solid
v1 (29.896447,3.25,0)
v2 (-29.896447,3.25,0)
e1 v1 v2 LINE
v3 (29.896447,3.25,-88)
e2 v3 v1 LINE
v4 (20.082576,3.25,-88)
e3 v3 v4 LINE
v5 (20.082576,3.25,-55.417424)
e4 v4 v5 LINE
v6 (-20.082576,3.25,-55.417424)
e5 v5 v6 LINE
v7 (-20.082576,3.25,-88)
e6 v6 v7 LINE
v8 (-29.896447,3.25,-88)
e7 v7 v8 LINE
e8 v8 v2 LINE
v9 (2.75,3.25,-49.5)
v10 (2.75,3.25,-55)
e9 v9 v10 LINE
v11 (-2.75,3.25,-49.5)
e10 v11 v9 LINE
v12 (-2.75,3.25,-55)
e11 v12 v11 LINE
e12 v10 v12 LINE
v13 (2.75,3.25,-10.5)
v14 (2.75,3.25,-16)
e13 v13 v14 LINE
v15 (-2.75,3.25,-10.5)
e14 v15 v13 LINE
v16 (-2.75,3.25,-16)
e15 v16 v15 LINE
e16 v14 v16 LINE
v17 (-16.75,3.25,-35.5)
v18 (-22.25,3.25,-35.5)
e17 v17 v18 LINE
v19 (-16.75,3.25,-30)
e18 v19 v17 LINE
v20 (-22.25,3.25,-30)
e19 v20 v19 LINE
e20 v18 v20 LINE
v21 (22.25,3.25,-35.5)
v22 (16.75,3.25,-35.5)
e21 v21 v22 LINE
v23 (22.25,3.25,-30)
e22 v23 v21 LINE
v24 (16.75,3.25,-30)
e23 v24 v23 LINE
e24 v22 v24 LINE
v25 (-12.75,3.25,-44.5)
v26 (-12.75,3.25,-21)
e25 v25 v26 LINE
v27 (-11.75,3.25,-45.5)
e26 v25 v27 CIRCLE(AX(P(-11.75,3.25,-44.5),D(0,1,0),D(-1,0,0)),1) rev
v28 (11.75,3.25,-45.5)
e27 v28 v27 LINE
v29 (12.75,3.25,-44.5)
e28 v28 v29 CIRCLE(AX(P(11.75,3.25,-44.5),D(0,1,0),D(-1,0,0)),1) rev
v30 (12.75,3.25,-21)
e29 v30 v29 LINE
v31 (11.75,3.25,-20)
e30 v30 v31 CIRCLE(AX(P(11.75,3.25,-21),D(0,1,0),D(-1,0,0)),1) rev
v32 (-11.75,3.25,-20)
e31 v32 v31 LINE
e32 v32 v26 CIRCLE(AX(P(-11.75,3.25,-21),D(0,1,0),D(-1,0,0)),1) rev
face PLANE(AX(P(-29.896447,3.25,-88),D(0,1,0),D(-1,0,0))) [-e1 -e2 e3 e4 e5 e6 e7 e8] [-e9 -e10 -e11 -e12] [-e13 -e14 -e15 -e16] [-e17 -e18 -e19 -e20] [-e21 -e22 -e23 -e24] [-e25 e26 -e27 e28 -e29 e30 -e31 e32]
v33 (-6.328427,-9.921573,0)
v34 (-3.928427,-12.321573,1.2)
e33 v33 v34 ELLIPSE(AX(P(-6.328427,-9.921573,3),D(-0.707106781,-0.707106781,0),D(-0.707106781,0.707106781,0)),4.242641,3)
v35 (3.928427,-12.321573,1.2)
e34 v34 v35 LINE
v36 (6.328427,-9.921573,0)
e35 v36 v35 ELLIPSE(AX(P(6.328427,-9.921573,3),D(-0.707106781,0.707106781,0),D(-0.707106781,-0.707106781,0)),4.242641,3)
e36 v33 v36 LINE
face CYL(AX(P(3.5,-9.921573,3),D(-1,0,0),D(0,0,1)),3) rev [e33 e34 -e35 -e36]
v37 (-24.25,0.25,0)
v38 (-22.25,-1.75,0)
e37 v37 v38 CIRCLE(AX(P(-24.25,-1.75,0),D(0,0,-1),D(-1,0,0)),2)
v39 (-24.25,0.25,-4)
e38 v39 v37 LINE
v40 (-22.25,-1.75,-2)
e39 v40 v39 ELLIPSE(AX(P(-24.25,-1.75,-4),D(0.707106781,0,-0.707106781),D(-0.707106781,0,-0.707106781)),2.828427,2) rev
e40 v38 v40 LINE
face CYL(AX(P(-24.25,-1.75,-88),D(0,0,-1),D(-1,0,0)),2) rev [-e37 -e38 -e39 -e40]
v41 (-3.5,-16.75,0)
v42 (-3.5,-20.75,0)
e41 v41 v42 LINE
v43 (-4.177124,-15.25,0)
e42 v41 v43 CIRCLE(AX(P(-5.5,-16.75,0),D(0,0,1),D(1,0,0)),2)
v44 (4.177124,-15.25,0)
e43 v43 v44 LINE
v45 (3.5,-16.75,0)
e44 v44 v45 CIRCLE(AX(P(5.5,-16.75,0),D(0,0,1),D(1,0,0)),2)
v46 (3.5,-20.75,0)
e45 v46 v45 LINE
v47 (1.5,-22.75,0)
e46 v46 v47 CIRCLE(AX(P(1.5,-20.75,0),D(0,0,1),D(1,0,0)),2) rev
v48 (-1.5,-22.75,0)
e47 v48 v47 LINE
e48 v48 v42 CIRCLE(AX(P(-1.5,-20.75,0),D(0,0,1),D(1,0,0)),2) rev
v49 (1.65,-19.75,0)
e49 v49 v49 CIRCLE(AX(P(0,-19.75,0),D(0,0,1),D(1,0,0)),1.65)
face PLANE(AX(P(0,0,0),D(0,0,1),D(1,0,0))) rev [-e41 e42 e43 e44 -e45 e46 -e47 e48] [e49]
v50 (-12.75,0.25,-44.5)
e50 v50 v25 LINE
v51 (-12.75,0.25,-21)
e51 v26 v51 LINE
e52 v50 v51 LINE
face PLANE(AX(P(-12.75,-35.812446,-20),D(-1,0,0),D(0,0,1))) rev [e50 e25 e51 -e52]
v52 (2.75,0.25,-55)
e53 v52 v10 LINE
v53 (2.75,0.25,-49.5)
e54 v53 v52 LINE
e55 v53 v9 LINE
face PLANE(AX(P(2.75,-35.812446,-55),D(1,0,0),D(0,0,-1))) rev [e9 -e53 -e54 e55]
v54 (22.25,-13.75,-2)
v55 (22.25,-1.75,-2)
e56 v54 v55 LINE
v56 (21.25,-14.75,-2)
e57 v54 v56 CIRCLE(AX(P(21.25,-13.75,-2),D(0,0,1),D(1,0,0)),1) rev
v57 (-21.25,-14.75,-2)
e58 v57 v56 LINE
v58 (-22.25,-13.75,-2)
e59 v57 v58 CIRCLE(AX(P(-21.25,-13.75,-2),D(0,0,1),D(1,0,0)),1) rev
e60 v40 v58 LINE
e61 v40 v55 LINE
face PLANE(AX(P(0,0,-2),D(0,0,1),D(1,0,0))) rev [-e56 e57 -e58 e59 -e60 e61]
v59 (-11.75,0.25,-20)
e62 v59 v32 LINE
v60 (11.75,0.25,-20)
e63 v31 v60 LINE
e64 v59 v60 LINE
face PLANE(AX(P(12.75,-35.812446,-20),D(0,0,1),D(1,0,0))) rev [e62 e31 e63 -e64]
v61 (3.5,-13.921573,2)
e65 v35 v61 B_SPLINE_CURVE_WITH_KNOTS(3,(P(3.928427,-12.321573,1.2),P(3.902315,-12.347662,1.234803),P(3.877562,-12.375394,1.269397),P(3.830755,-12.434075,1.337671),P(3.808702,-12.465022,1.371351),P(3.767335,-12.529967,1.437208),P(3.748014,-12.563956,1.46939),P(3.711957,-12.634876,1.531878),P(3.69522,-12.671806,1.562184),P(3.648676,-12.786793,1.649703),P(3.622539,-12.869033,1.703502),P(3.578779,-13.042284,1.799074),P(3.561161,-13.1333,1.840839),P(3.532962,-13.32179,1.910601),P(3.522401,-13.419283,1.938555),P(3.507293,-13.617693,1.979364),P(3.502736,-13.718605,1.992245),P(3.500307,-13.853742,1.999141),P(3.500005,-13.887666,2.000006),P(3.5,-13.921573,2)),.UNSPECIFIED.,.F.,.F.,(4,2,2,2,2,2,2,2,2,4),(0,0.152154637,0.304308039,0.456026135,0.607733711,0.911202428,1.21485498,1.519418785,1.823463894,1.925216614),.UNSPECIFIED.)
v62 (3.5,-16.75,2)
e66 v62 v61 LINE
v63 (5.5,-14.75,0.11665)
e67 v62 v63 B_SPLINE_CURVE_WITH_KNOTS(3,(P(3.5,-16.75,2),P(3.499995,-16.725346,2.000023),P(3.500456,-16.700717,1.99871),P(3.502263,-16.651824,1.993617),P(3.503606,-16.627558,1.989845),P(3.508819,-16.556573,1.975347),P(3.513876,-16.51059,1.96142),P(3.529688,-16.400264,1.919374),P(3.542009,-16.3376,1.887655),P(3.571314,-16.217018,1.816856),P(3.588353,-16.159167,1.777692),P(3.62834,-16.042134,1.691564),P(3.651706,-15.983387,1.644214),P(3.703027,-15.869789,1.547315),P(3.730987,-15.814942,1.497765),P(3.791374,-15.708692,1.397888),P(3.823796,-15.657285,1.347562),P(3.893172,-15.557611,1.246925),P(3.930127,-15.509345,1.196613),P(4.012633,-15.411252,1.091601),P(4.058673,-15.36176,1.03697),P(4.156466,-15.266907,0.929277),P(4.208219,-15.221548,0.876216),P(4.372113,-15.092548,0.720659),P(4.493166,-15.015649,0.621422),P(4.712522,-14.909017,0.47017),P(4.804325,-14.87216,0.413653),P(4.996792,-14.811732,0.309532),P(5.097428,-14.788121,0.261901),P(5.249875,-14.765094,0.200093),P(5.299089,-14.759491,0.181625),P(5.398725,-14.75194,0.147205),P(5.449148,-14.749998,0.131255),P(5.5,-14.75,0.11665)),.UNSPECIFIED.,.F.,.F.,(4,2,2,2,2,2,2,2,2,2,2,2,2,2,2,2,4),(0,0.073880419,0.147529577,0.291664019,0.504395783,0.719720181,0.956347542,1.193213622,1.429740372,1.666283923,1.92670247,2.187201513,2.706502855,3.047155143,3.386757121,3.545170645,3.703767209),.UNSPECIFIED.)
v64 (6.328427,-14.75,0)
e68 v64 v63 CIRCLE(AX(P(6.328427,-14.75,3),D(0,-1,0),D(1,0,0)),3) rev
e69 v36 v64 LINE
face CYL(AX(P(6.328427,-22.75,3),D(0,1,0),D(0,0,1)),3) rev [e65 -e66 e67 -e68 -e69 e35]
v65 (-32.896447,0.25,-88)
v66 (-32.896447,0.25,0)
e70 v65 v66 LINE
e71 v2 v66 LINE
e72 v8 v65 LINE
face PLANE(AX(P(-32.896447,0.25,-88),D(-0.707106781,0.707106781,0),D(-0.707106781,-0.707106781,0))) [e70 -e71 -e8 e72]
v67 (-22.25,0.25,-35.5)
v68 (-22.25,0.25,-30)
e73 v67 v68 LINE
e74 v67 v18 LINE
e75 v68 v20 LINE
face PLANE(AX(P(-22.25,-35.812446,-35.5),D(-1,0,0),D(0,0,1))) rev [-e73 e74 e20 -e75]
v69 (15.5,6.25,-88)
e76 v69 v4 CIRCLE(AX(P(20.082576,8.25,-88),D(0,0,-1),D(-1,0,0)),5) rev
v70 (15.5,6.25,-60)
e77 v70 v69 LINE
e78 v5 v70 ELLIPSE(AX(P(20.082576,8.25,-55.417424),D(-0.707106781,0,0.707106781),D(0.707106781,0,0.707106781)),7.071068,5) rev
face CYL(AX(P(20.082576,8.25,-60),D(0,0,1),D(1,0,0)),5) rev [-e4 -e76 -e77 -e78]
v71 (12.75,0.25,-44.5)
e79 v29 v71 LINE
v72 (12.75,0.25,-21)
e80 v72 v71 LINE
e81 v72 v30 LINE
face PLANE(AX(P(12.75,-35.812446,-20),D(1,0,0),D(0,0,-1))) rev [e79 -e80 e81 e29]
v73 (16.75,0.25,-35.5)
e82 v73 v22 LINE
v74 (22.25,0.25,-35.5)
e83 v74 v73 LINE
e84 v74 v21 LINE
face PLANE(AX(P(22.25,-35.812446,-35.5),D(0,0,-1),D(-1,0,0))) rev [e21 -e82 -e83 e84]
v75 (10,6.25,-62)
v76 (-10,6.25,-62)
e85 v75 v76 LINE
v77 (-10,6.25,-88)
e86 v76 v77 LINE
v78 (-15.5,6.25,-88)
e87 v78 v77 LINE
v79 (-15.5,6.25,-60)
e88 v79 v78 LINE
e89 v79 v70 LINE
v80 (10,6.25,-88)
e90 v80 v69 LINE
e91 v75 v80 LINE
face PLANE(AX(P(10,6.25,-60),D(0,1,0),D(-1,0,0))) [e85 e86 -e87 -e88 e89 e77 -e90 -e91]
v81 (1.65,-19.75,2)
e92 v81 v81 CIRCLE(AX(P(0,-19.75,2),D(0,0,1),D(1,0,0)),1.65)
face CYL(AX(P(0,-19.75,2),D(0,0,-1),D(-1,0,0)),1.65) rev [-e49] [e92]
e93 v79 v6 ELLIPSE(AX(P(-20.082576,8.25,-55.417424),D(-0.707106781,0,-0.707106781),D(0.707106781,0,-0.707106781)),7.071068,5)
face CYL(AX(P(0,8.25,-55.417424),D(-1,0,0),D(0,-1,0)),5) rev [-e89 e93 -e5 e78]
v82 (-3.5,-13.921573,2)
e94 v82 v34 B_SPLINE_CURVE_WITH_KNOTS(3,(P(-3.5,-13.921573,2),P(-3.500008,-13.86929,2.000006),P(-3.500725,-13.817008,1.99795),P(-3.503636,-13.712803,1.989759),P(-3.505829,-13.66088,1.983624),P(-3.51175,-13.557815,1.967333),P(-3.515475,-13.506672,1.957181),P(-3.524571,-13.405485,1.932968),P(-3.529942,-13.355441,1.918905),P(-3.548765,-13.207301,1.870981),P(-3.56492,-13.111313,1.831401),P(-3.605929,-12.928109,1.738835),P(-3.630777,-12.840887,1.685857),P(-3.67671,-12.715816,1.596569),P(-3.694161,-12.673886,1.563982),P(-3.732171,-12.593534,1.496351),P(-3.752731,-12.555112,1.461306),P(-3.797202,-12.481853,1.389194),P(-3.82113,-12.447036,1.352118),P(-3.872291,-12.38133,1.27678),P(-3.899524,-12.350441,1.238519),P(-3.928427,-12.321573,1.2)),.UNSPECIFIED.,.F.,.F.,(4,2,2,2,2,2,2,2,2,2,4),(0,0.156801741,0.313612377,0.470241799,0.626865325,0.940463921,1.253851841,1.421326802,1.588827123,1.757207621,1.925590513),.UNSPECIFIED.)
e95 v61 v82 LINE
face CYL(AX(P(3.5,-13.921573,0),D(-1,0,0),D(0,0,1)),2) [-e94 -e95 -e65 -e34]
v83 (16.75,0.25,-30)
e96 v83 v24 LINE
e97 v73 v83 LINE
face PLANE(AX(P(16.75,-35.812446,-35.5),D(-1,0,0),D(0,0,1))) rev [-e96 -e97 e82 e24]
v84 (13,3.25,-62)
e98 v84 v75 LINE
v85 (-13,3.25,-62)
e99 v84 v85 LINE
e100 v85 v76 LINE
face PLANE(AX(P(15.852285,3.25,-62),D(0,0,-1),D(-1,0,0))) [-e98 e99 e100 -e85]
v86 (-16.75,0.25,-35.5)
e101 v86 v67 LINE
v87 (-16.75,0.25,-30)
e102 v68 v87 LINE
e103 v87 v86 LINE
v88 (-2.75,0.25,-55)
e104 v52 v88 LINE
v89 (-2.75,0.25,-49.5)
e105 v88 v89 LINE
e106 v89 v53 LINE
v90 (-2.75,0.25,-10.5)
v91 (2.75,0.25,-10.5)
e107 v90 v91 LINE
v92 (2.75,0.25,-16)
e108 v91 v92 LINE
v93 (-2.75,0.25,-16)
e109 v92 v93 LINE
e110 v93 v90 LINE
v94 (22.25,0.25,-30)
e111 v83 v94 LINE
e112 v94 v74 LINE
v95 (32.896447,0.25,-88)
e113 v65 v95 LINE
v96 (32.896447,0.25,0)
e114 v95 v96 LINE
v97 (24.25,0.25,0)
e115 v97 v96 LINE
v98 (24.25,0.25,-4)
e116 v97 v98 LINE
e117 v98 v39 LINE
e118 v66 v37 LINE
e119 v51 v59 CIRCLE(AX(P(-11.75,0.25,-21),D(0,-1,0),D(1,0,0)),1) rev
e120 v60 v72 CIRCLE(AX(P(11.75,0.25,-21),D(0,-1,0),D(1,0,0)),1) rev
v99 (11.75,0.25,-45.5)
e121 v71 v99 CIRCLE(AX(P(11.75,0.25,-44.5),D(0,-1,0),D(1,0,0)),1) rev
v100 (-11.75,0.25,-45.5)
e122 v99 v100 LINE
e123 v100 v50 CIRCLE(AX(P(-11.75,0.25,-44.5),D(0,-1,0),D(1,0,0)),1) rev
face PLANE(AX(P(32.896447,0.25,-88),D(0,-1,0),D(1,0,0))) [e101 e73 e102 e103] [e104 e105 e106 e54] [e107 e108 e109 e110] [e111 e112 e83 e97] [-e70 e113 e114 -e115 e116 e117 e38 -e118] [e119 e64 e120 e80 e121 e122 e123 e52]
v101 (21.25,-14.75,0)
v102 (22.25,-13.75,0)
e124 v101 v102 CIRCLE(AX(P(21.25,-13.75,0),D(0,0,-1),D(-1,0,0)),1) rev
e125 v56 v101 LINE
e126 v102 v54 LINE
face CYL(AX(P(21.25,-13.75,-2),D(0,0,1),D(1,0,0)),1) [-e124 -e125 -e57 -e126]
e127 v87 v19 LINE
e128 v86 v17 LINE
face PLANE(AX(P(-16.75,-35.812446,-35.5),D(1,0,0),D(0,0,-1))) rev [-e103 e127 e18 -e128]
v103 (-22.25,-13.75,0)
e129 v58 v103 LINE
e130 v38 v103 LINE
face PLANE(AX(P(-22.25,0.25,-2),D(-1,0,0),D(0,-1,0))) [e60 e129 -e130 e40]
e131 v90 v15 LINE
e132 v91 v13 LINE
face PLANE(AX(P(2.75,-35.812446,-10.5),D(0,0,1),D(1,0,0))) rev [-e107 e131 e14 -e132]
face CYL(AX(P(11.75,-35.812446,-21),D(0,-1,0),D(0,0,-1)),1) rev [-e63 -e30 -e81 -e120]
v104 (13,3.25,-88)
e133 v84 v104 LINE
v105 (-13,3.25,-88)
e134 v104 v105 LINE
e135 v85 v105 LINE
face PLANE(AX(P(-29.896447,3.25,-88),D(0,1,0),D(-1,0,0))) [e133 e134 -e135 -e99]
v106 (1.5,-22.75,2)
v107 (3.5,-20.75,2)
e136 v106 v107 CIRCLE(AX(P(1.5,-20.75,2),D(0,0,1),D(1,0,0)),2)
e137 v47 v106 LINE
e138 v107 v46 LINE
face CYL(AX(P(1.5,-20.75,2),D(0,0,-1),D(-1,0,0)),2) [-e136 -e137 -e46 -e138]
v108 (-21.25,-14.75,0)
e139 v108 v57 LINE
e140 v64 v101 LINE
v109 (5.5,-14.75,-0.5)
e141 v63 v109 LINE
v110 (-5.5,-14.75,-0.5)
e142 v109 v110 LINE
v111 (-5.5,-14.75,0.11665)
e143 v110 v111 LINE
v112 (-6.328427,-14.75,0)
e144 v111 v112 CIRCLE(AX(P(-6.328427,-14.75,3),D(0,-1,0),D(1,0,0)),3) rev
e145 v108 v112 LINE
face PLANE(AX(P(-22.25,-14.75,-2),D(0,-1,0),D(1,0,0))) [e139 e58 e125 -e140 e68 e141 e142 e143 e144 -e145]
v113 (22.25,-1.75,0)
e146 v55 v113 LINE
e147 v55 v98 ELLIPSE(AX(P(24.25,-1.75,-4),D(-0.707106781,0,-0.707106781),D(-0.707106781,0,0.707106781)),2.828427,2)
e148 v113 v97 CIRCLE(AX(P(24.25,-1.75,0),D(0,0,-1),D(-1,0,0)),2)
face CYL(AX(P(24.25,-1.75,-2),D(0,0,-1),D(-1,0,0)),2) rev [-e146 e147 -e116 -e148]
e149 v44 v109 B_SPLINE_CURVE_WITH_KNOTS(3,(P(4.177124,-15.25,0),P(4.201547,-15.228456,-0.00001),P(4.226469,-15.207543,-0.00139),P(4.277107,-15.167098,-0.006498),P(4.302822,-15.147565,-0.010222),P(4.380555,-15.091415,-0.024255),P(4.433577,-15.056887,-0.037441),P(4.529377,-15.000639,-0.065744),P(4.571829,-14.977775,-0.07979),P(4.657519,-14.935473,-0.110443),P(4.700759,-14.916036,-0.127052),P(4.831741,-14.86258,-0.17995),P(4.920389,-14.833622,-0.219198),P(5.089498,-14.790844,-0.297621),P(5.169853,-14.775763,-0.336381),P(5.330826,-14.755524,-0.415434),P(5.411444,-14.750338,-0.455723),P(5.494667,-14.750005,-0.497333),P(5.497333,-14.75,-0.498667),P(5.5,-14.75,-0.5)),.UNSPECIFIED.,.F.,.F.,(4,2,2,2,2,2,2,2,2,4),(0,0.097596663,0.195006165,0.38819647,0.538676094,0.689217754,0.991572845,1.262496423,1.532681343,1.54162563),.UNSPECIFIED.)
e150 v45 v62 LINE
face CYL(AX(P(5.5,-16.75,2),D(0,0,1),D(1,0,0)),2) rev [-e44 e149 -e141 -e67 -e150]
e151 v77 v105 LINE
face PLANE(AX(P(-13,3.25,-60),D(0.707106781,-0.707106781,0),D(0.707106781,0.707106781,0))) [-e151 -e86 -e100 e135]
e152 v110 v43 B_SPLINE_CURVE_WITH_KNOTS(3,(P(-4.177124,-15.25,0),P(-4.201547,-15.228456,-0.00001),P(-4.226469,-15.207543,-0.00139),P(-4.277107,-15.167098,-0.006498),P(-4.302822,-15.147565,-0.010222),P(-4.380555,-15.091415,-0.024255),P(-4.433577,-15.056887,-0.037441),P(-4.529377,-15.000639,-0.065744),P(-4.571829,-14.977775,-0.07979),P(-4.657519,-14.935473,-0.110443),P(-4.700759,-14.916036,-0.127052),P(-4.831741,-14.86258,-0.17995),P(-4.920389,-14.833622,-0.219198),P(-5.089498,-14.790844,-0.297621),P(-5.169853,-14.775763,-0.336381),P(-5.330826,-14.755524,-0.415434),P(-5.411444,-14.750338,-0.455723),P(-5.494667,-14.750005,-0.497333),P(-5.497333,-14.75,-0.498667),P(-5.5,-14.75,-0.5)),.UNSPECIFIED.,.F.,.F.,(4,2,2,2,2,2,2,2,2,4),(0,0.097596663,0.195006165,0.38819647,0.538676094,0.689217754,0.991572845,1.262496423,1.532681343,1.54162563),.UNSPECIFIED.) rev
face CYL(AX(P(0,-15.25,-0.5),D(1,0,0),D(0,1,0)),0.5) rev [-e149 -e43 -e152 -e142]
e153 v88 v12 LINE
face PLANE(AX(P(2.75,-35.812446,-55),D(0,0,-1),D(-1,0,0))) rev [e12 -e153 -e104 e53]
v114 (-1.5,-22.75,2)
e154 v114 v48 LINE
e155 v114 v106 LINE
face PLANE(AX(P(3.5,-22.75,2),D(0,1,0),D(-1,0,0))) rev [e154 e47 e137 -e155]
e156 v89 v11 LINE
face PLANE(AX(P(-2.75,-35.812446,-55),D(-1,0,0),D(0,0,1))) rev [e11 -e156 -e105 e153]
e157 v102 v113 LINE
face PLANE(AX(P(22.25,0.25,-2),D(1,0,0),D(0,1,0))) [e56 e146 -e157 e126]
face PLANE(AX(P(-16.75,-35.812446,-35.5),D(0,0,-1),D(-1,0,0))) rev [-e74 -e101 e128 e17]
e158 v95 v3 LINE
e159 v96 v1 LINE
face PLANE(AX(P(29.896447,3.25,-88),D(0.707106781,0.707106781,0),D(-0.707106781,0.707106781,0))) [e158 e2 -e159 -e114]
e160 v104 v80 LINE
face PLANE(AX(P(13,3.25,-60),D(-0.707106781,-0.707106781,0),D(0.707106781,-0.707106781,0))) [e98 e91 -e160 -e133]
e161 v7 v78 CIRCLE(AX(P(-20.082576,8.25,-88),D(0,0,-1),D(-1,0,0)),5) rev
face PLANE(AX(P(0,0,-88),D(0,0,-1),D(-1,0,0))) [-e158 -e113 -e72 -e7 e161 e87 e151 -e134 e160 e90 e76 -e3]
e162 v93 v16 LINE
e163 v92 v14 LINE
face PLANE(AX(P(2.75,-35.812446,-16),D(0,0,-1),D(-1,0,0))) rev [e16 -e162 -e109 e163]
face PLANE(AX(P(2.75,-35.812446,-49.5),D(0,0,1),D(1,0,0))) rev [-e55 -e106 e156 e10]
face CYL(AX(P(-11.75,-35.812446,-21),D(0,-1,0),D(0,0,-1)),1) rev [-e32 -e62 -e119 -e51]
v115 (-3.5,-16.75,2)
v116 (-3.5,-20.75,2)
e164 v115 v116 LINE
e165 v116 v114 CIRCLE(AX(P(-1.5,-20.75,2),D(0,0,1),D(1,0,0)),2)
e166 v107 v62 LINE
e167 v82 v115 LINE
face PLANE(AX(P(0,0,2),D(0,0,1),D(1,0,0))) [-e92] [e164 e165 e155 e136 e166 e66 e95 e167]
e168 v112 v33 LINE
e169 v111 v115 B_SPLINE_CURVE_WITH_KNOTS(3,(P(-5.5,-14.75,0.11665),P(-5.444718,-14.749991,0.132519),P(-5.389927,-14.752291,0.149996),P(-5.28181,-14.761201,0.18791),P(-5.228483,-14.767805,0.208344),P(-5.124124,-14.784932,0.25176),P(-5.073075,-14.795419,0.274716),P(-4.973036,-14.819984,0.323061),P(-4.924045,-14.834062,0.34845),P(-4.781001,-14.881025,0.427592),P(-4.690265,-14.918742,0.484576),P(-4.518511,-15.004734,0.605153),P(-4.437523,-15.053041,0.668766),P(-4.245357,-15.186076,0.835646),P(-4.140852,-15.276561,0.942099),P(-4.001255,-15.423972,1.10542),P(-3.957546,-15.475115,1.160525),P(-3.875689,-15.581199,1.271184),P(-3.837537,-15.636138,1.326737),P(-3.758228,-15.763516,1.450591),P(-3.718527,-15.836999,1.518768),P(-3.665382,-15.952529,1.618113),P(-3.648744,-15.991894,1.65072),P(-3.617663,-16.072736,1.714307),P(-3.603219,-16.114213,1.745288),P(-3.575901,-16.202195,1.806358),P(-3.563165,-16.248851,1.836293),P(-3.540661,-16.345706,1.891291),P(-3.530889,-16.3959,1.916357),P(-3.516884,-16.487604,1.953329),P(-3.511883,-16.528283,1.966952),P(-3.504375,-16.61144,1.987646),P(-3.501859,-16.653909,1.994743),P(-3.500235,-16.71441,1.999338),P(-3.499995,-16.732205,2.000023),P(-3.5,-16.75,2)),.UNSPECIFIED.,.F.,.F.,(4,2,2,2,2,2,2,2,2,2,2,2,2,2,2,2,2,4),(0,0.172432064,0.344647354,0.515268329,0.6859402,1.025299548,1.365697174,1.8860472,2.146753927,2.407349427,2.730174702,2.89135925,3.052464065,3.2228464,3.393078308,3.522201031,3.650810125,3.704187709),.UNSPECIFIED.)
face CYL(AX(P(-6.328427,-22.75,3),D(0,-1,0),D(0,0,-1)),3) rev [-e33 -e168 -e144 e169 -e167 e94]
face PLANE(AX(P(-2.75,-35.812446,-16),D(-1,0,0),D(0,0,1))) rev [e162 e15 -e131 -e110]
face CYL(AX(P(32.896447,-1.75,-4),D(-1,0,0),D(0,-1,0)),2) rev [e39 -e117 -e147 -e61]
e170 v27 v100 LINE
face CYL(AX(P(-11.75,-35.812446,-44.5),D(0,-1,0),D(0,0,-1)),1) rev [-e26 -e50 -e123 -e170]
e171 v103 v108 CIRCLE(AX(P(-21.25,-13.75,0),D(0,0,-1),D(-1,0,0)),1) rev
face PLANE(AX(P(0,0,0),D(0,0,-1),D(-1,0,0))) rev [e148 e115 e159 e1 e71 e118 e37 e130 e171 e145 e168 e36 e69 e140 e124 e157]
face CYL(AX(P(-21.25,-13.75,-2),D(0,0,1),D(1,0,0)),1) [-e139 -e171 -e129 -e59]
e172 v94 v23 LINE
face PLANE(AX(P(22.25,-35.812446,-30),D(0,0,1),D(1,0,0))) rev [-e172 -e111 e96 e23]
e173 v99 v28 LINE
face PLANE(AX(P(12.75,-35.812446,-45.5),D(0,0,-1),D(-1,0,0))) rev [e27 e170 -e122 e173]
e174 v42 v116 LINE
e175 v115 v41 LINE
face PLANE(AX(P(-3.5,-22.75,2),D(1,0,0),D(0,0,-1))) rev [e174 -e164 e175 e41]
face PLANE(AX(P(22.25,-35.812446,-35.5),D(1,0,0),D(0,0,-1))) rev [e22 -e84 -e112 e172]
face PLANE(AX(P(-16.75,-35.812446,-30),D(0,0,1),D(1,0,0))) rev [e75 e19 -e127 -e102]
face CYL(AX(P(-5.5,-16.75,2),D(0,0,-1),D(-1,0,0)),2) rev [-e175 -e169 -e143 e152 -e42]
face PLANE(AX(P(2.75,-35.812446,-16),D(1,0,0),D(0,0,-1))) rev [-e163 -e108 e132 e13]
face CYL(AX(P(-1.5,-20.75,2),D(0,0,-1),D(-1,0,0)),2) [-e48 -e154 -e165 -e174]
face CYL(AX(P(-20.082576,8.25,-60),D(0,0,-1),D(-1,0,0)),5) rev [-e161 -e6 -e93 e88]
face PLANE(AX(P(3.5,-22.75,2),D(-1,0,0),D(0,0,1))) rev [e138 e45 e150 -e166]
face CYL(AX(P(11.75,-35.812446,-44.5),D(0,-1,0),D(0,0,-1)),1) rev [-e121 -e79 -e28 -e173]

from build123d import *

# Parameters (mm, degrees)
BOSS_EXTRUDE1_DEPTH = 88
SKETCH2_W           = 44.5
SKETCH2_H           = 15
BOSS_EXTRUDE2_DEPTH = 2
SKETCH3_W           = 7
SKETCH3_H           = 10
SKETCH3_R           = 1.65
BOSS_EXTRUDE3_DEPTH = 2
FILLET1_R           = 3
FILLET2_R           = 2
FILLET3_R           = 2
FILLET4_R           = 2
FILLET5_R           = 0.5
FILLET6_R           = 1
FILLET7_R           = 2
SKETCH4_W           = 25.5
SKETCH4_H           = 25.5
SKETCH4_W_2         = 5.5
SKETCH4_H_2         = 5.5
CUT_EXTRUDE1_DEPTH  = 3
FILLET8_R           = 1
BOSS_EXTRUDE4_DEPTH = 28
BOSS_EXTRUDE5_REACH = 104.975
SKETCH7_W           = 2
SKETCH7_H           = 3
FILLET9_R           = 5


with BuildPart() as part:
    # Sketch1 → Boss-Extrude1 (new body)
    with BuildSketch(Plane.XY):
        Polygon((29.896446609, 3.25), (32.896446609, 0.25), (-32.896446609, 0.25), (-29.896446609, 3.25), align=None)
    extrude(amount=-BOSS_EXTRUDE1_DEPTH)

    # Sketch2 → Boss-Extrude2 (add)
    with BuildSketch(Plane.XY):
        with Locations((0, -7.25)):
            Rectangle(SKETCH2_W, SKETCH2_H)
    extrude(amount=-BOSS_EXTRUDE2_DEPTH)

    # Sketch3 → Boss-Extrude3 (add)
    with BuildSketch(Plane.XY):
        with Locations((0, -17.75)):
            Rectangle(SKETCH3_W, SKETCH3_H)
        with Locations((0, -19.75)):
            Circle(SKETCH3_R, mode=Mode.SUBTRACT)
    extrude(amount=BOSS_EXTRUDE3_DEPTH)

    # Fillet1
    # the kernel refuses this fillet: 3 mm, written as the material it adds along each edge
    with BuildSketch(Plane(origin=(3.5, -12.75, 0), x_dir=(1, 0, 0), z_dir=(0, -1, 0))) as fillet1_piece_1_section:
        with BuildLine():
            CenterArc((2.828427125, 3), FILLET1_R, 199.471220634, 70.528779366)
            Line((0, 2), (-0.056568542, 1.98))
            ThreePointArc((-0.056568542, 1.98), (-0.06, 1), (-0.06, 0))
            Line((-0.06, 0), (0, -0.06))
            Line((0, -0.06), (2.828427125, -0.06))
            Line((2.828427125, -0.06), (2.828427125, 0))
        make_face()
    fillet1_piece_1 = extrude(amount=2, mode=Mode.PRIVATE)
    fillet1_piece_1 = split(fillet1_piece_1, bisect_by=Plane(origin=(4.103392335, -13.75, 0), z_dir=(0, 0, 1)), keep=Keep.TOP, mode=Mode.PRIVATE)
    add(fillet1_piece_1)
    with BuildSketch(Plane(origin=(-3.5, -14.75, 0), x_dir=(-1, 0, 0), z_dir=(0, 1, 0))) as fillet1_piece_2_section:
        with BuildLine():
            CenterArc((2.828427125, 3), FILLET1_R, 199.471220634, 70.528779366)
            Line((0, 2), (-0.056568542, 1.98))
            ThreePointArc((-0.056568542, 1.98), (-0.06, 1), (-0.06, 0))
            Line((-0.06, 0), (0, -0.06))
            Line((0, -0.06), (2.828427125, -0.06))
            Line((2.828427125, -0.06), (2.828427125, 0))
        make_face()
    fillet1_piece_2 = extrude(amount=2, mode=Mode.PRIVATE)
    fillet1_piece_2 = split(fillet1_piece_2, bisect_by=Plane(origin=(-4.103392335, -13.75, 0), z_dir=(0, 0, 1)), keep=Keep.TOP, mode=Mode.PRIVATE)
    add(fillet1_piece_2)
    with BuildSketch(Plane(origin=(-3.5, -12.75, 0), x_dir=(0, 1, 0), z_dir=(1, 0, 0))) as fillet1_piece_3:
        with BuildLine():
            CenterArc((2.828427125, 3), FILLET1_R, 199.471220634, 70.528779366)
            Line((0, 2), (-0.056568542, 1.98))
            ThreePointArc((-0.056568542, 1.98), (-0.06, 1), (-0.06, 0))
            Line((-0.06, 0), (0, -0.06))
            Line((0, -0.06), (2.828427125, -0.06))
            Line((2.828427125, -0.06), (2.828427125, 0))
        make_face()
    extrude(amount=7)
    with BuildSketch(Plane(origin=(-3.5, -12.75, 0), x_dir=(0, 1, 0), z_dir=(1, 0, 0))) as fillet1_piece_4a_section:
        with BuildLine():
            CenterArc((2.828427125, 3), FILLET1_R, 199.471220634, 70.528779366)
            Line((0, 2), (-0.056568542, 1.98))
            ThreePointArc((-0.056568542, 1.98), (-0.06, 1), (-0.06, 0))
            Line((-0.06, 0), (0, -0.06))
            Line((0, -0.06), (2.828427125, -0.06))
            Line((2.828427125, -0.06), (2.828427125, 0))
        make_face()
    fillet1_piece_4a = extrude(amount=14.071067812, mode=Mode.PRIVATE)
    fillet1_piece_4a = split(fillet1_piece_4a, bisect_by=Plane(origin=(3.5, -12.071681569, 0.51353179), z_dir=(1, 0, 0)), keep=Keep.TOP, mode=Mode.PRIVATE)
    with BuildSketch(Plane(origin=(3.5, -5.678932188, 0), x_dir=(1, 0, 0), z_dir=(0, -1, 0))) as fillet1_piece_4b_section:
        with BuildLine():
            CenterArc((2.828427125, 3), FILLET1_R, 199.471220634, 70.528779366)
            Line((0, 2), (-0.056568542, 1.98))
            ThreePointArc((-0.056568542, 1.98), (-0.06, 1), (-0.06, 0))
            Line((-0.06, 0), (0, -0.06))
            Line((0, -0.06), (2.828427125, -0.06))
            Line((2.828427125, -0.06), (2.828427125, 0))
        make_face()
    fillet1_piece_4b = extrude(amount=9.071067812, mode=Mode.PRIVATE)
    fillet1_piece_4b = split(fillet1_piece_4b, bisect_by=Plane(origin=(4.103392335, -12.75, 0.570016865), z_dir=(0, 1, 0)), keep=Keep.TOP, mode=Mode.PRIVATE)
    fillet1_piece_4b = split(fillet1_piece_4b, bisect_by=Plane(origin=(4.103392335, -9.214466094, 0), z_dir=(0, 0, 1)), keep=Keep.TOP, mode=Mode.PRIVATE)
    fillet1_piece_4 = fillet1_piece_4a & fillet1_piece_4b
    add(fillet1_piece_4)
    with BuildSketch(Plane(origin=(-3.5, -12.75, 0), x_dir=(0, 1, 0), z_dir=(1, 0, 0))) as fillet1_piece_5a_section:
        with BuildLine():
            CenterArc((2.828427125, 3), FILLET1_R, 199.471220634, 70.528779366)
            Line((0, 2), (-0.056568542, 1.98))
            ThreePointArc((-0.056568542, 1.98), (-0.06, 1), (-0.06, 0))
            Line((-0.06, 0), (0, -0.06))
            Line((0, -0.06), (2.828427125, -0.06))
            Line((2.828427125, -0.06), (2.828427125, 0))
        make_face()
    fillet1_piece_5a = extrude(amount=14.071067812, mode=Mode.PRIVATE)
    fillet1_piece_5a = split(fillet1_piece_5a, bisect_by=Plane(origin=(3.5, -12.071681569, 0.51353179), z_dir=(1, 0, 0)), keep=Keep.TOP, mode=Mode.PRIVATE)
    with BuildSketch(Plane(origin=(3.5, -5.678932188, 0), x_dir=(1, 0, 0), z_dir=(0, -1, 0))) as fillet1_piece_5b_section:
        with BuildLine():
            CenterArc((2.828427125, 3), FILLET1_R, 199.471220634, 70.528779366)
            Line((0, 2), (-0.056568542, 1.98))
            ThreePointArc((-0.056568542, 1.98), (-0.06, 1), (-0.06, 0))
            Line((-0.06, 0), (0, -0.06))
            Line((0, -0.06), (2.828427125, -0.06))
            Line((2.828427125, -0.06), (2.828427125, 0))
        make_face()
    fillet1_piece_5b = extrude(amount=9.071067812, mode=Mode.PRIVATE)
    fillet1_piece_5b = split(fillet1_piece_5b, bisect_by=Plane(origin=(4.899161086, -12.75, -0.029895047), z_dir=(0, 1, 0)), keep=Keep.TOP, mode=Mode.PRIVATE)
    fillet1_piece_5b = split(fillet1_piece_5b, bisect_by=Plane(origin=(4.899161086, -9.214466094, 0), z_dir=(0, 0, -1)), keep=Keep.TOP, mode=Mode.PRIVATE)
    fillet1_piece_5 = fillet1_piece_5a & fillet1_piece_5b
    add(fillet1_piece_5)
    with BuildSketch(Plane(origin=(-3.5, -12.75, 0), x_dir=(0, 1, 0), z_dir=(1, 0, 0))) as fillet1_piece_6a_section:
        with BuildLine():
            CenterArc((2.828427125, 3), FILLET1_R, 199.471220634, 70.528779366)
            Line((0, 2), (-0.056568542, 1.98))
            ThreePointArc((-0.056568542, 1.98), (-0.06, 1), (-0.06, 0))
            Line((-0.06, 0), (0, -0.06))
            Line((0, -0.06), (2.828427125, -0.06))
            Line((2.828427125, -0.06), (2.828427125, 0))
        make_face()
    fillet1_piece_6a = extrude(amount=14.071067812, mode=Mode.PRIVATE)
    fillet1_piece_6a = split(fillet1_piece_6a, bisect_by=Plane(origin=(3.5, -12.071681569, 0.51353179), z_dir=(1, 0, 0)), keep=Keep.TOP, mode=Mode.PRIVATE)
    with BuildSketch(Plane(origin=(3.5, -12.75, 0), x_dir=(1, 0, 0), z_dir=(0, -1, 0))) as fillet1_piece_6b_section:
        with BuildLine():
            CenterArc((2.828427125, 3), FILLET1_R, 199.471220634, 70.528779366)
            Line((0, 2), (-0.056568542, 1.98))
            ThreePointArc((-0.056568542, 1.98), (-0.06, 1), (-0.06, 0))
            Line((-0.06, 0), (0, -0.06))
            Line((0, -0.06), (2.828427125, -0.06))
            Line((2.828427125, -0.06), (2.828427125, 0))
        make_face()
    fillet1_piece_6b = extrude(amount=2, mode=Mode.PRIVATE)
    fillet1_piece_6b = split(fillet1_piece_6b, bisect_by=Plane(origin=(4.899161086, -13.75, 0), z_dir=(0, 0, -1)), keep=Keep.TOP, mode=Mode.PRIVATE)
    fillet1_piece_6 = fillet1_piece_6a & fillet1_piece_6b
    add(fillet1_piece_6)
    with BuildSketch(Plane(origin=(-3.5, -14.75, 0), x_dir=(-1, 0, 0), z_dir=(0, 1, 0))) as fillet1_piece_7a_section:
        with BuildLine():
            CenterArc((2.828427125, 3), FILLET1_R, 199.471220634, 70.528779366)
            Line((0, 2), (-0.056568542, 1.98))
            ThreePointArc((-0.056568542, 1.98), (-0.06, 1), (-0.06, 0))
            Line((-0.06, 0), (0, -0.06))
            Line((0, -0.06), (2.828427125, -0.06))
            Line((2.828427125, -0.06), (2.828427125, 0))
        make_face()
    fillet1_piece_7a = extrude(amount=9.071067812, mode=Mode.PRIVATE)
    fillet1_piece_7a = split(fillet1_piece_7a, bisect_by=Plane(origin=(-4.103392335, -12.75, 0.570016865), z_dir=(0, 1, 0)), keep=Keep.TOP, mode=Mode.PRIVATE)
    fillet1_piece_7a = split(fillet1_piece_7a, bisect_by=Plane(origin=(-4.103392335, -9.214466094, 0), z_dir=(0, 0, 1)), keep=Keep.TOP, mode=Mode.PRIVATE)
    with BuildSketch(Plane(origin=(-10.571067812, -12.75, 0), x_dir=(0, 1, 0), z_dir=(1, 0, 0))) as fillet1_piece_7b_section:
        with BuildLine():
            CenterArc((2.828427125, 3), FILLET1_R, 199.471220634, 70.528779366)
            Line((0, 2), (-0.056568542, 1.98))
            ThreePointArc((-0.056568542, 1.98), (-0.06, 1), (-0.06, 0))
            Line((-0.06, 0), (0, -0.06))
            Line((0, -0.06), (2.828427125, -0.06))
            Line((2.828427125, -0.06), (2.828427125, 0))
        make_face()
    fillet1_piece_7b = extrude(amount=14.071067812, mode=Mode.PRIVATE)
    fillet1_piece_7b = split(fillet1_piece_7b, bisect_by=Plane(origin=(-3.5, -12.071681569, 0.51353179), z_dir=(-1, 0, 0)), keep=Keep.TOP, mode=Mode.PRIVATE)
    fillet1_piece_7 = fillet1_piece_7a & fillet1_piece_7b
    add(fillet1_piece_7)
    with BuildSketch(Plane(origin=(-3.5, -14.75, 0), x_dir=(-1, 0, 0), z_dir=(0, 1, 0))) as fillet1_piece_8a_section:
        with BuildLine():
            CenterArc((2.828427125, 3), FILLET1_R, 199.471220634, 70.528779366)
            Line((0, 2), (-0.056568542, 1.98))
            ThreePointArc((-0.056568542, 1.98), (-0.06, 1), (-0.06, 0))
            Line((-0.06, 0), (0, -0.06))
            Line((0, -0.06), (2.828427125, -0.06))
            Line((2.828427125, -0.06), (2.828427125, 0))
        make_face()
    fillet1_piece_8a = extrude(amount=2, mode=Mode.PRIVATE)
    fillet1_piece_8a = split(fillet1_piece_8a, bisect_by=Plane(origin=(-4.899161086, -13.75, 0), z_dir=(0, 0, -1)), keep=Keep.TOP, mode=Mode.PRIVATE)
    with BuildSketch(Plane(origin=(-10.571067812, -12.75, 0), x_dir=(0, 1, 0), z_dir=(1, 0, 0))) as fillet1_piece_8b_section:
        with BuildLine():
            CenterArc((2.828427125, 3), FILLET1_R, 199.471220634, 70.528779366)
            Line((0, 2), (-0.056568542, 1.98))
            ThreePointArc((-0.056568542, 1.98), (-0.06, 1), (-0.06, 0))
            Line((-0.06, 0), (0, -0.06))
            Line((0, -0.06), (2.828427125, -0.06))
            Line((2.828427125, -0.06), (2.828427125, 0))
        make_face()
    fillet1_piece_8b = extrude(amount=14.071067812, mode=Mode.PRIVATE)
    fillet1_piece_8b = split(fillet1_piece_8b, bisect_by=Plane(origin=(-3.5, -12.071681569, 0.51353179), z_dir=(-1, 0, 0)), keep=Keep.TOP, mode=Mode.PRIVATE)
    fillet1_piece_8 = fillet1_piece_8a & fillet1_piece_8b
    add(fillet1_piece_8)
    with BuildSketch(Plane(origin=(-3.5, -14.75, 0), x_dir=(-1, 0, 0), z_dir=(0, 1, 0))) as fillet1_piece_9a_section:
        with BuildLine():
            CenterArc((2.828427125, 3), FILLET1_R, 199.471220634, 70.528779366)
            Line((0, 2), (-0.056568542, 1.98))
            ThreePointArc((-0.056568542, 1.98), (-0.06, 1), (-0.06, 0))
            Line((-0.06, 0), (0, -0.06))
            Line((0, -0.06), (2.828427125, -0.06))
            Line((2.828427125, -0.06), (2.828427125, 0))
        make_face()
    fillet1_piece_9a = extrude(amount=9.071067812, mode=Mode.PRIVATE)
    fillet1_piece_9a = split(fillet1_piece_9a, bisect_by=Plane(origin=(-4.899161086, -12.75, -0.029895047), z_dir=(0, 1, 0)), keep=Keep.TOP, mode=Mode.PRIVATE)
    fillet1_piece_9a = split(fillet1_piece_9a, bisect_by=Plane(origin=(-4.899161086, -9.214466094, 0), z_dir=(0, 0, -1)), keep=Keep.TOP, mode=Mode.PRIVATE)
    with BuildSketch(Plane(origin=(-10.571067812, -12.75, 0), x_dir=(0, 1, 0), z_dir=(1, 0, 0))) as fillet1_piece_9b_section:
        with BuildLine():
            CenterArc((2.828427125, 3), FILLET1_R, 199.471220634, 70.528779366)
            Line((0, 2), (-0.056568542, 1.98))
            ThreePointArc((-0.056568542, 1.98), (-0.06, 1), (-0.06, 0))
            Line((-0.06, 0), (0, -0.06))
            Line((0, -0.06), (2.828427125, -0.06))
            Line((2.828427125, -0.06), (2.828427125, 0))
        make_face()
    fillet1_piece_9b = extrude(amount=14.071067812, mode=Mode.PRIVATE)
    fillet1_piece_9b = split(fillet1_piece_9b, bisect_by=Plane(origin=(-3.5, -12.071681569, 0.51353179), z_dir=(-1, 0, 0)), keep=Keep.TOP, mode=Mode.PRIVATE)
    fillet1_piece_9 = fillet1_piece_9a & fillet1_piece_9b
    add(fillet1_piece_9)

    # Fillet2
    # the kernel refuses this fillet: 2 mm, written as the material it adds along each edge
    with BuildSketch(Plane(origin=(3.5, -14.75, 0), x_dir=(0, -1, 0), z_dir=(0, 0, 1))) as fillet2_piece_1_section:
        with BuildLine():
            CenterArc((FILLET2_R, FILLET2_R), FILLET2_R, 180, 90)
            Line((0, FILLET2_R), (0, 0))
            Line((0, 0), (FILLET2_R, 0))
        make_face()
    fillet2_piece_1 = extrude(amount=2, mode=Mode.PRIVATE)
    fillet2_piece_1 = fillet2_piece_1 - Plane(origin=(6.328427125, -15.280348572, 3), x_dir=(1, 0, 0), z_dir=(0, 1, 0)) * Cylinder(3, 12, mode=Mode.PRIVATE)
    add(fillet2_piece_1)
    with BuildSketch(Plane(origin=(-3.5, -14.75, 0), x_dir=(0, -1, 0), z_dir=(0, 0, 1))) as fillet2_piece_2_section:
        with BuildLine():
            CenterArc((FILLET2_R, -FILLET2_R), FILLET2_R, 90, 90)
            Line((0, -FILLET2_R), (0, 0))
            Line((0, 0), (FILLET2_R, 0))
        make_face()
    fillet2_piece_2 = extrude(amount=2, mode=Mode.PRIVATE)
    fillet2_piece_2 = fillet2_piece_2 - Plane(origin=(-6.328427125, -15.280348572, 3), x_dir=(-1, 0, 0), z_dir=(0, -1, 0)) * Cylinder(3, 12, mode=Mode.PRIVATE)
    add(fillet2_piece_2)

    # Fillet3
    fillet3_edges = [part.edges().sort_by_distance(p)[0] for p in [
        (-3.5, -22.75, 1),
        (3.5, -22.75, 1),
    ]]
    fillet(fillet3_edges, radius=FILLET3_R)

    # Fillet4
    fillet4_edges = [part.edges().sort_by_distance(p)[0] for p in [
        (0, -12.75, 2),
    ]]
    fillet(fillet4_edges, radius=FILLET4_R)

    # Fillet5
    fillet5_edges = [part.edges().sort_by_distance(p)[0] for p in [
        (0, -14.75, 0),
    ]]
    fillet(fillet5_edges, radius=FILLET5_R)

    # Fillet6
    fillet6_edges = [part.edges().sort_by_distance(p)[0] for p in [
        (22.25, -14.75, -1),
        (-22.25, -14.75, -1),
    ]]
    fillet(fillet6_edges, radius=FILLET6_R)

    # Fillet7
    fillet7_edges = [part.edges().sort_by_distance(p)[0] for p in [
        (22.25, 0.25, -1),
        (0, 0.25, -2),
        (-22.25, 0.25, -1),
    ]]
    fillet(fillet7_edges, radius=FILLET7_R)

    # Sketch4 → Cut-Extrude1 (cut)
    with BuildSketch(Plane(origin=(0, 3.25, 0), x_dir=(1, 0, 0), z_dir=(0, 1, 0))):
        with Locations((0, 32.75)):
            Rectangle(SKETCH4_W, SKETCH4_H)
        with Locations((0, 13.25)):
            Rectangle(SKETCH4_W_2, SKETCH4_H_2)
        with Locations((19.5, 32.75)):
            Rectangle(SKETCH4_W_2, SKETCH4_H_2)
        with Locations((-19.5, 32.75)):
            Rectangle(SKETCH4_W_2, SKETCH4_H_2)
        with Locations((0, 52.25)):
            Rectangle(SKETCH4_W_2, SKETCH4_H_2)
    extrude(amount=-CUT_EXTRUDE1_DEPTH, mode=Mode.SUBTRACT)

    # Fillet8
    fillet8_edges = [part.edges().sort_by_distance(p)[0] for p in [
        (12.75, 1.75, -20),
        (12.75, 1.75, -45.5),
        (-12.75, 1.75, -45.5),
        (-12.75, 1.75, -20),
    ]]
    fillet(fillet8_edges, radius=FILLET8_R)

    # Sketch6 → Boss-Extrude4 (add)
    with BuildSketch(Plane(origin=(0, 0, -88), x_dir=(-1, 0, 0), z_dir=(0, 0, -1))):
        Polygon((-13, 3.25), (-10, 6.25), (-15.5, 6.25), (-15.5, 3.25), align=None)
        Polygon((15.5, 6.25), (15.5, 3.25), (13, 3.25), (10, 6.25), align=None)
    extrude(amount=-BOSS_EXTRUDE4_DEPTH)

    # Boss-Extrude5: up to this plane
    boss_extrude5_end = Plane(origin=(13, 3.25, -60), z_dir=(-0.7071067811865439, -0.7071067811865512, 0))
    # Sketch7 → Boss-Extrude5 (add, up to the surface)
    with BuildSketch(Plane.ZY.offset(15.5), mode=Mode.PRIVATE) as boss_extrude5_sk1:
        with Locations((-61, 4.75)):
            Rectangle(SKETCH7_W, SKETCH7_H)
    boss_extrude5_tool1 = split(extrude(boss_extrude5_sk1.sketch, amount=-BOSS_EXTRUDE5_REACH, mode=Mode.PRIVATE), bisect_by=boss_extrude5_end, keep=Keep.BOTH, mode=Mode.PRIVATE)
    add(boss_extrude5_tool1.solids().sort_by_distance((-15.5, 4.75, -61))[0])

    # Fillet9
    # the kernel refuses this fillet: 5 mm, written as the material it adds along each edge
    with BuildSketch(Plane(origin=(15.5, 3.25, -60), x_dir=(0, 0, 1), z_dir=(-1, 0, 0))) as fillet9_piece_1:
        with BuildLine():
            CenterArc((4.582575695, 5), FILLET9_R, 203.578178478, 66.421821522)
            Line((0, 3), (-0.091651514, 2.96))
            ThreePointArc((-0.091651514, 2.96), (-0.1, 1.5), (-0.1, 0))
            Line((-0.1, 0), (0, -0.1))
            Line((0, -0.1), (4.582575695, -0.1))
            Line((4.582575695, -0.1), (4.582575695, 0))
        make_face()
    extrude(amount=31)
    with BuildSketch(Plane(origin=(-15.5, 3.25, -60), x_dir=(-1, 0, 0), z_dir=(0, 0, -1)), Plane(origin=(15.5, 3.25, -88), x_dir=(1, 0, 0), z_dir=(0, 0, 1))) as fillet9_piece_2:
        with BuildLine():
            CenterArc((4.582575695, 5), FILLET9_R, 203.578178478, 66.421821522)
            Line((0, 3), (-0.091651514, 2.96))
            ThreePointArc((-0.091651514, 2.96), (-0.1, 1.5), (-0.1, 0))
            Line((-0.1, 0), (0, -0.1))
            Line((0, -0.1), (4.582575695, -0.1))
            Line((4.582575695, -0.1), (4.582575695, 0))
        make_face()
    extrude(amount=28)
    with BuildSketch(Plane(origin=(26.956439237, 3.25, -60), x_dir=(0, 0, 1), z_dir=(-1, 0, 0))) as fillet9_piece_3a_section:
        with BuildLine():
            CenterArc((4.582575695, 5), FILLET9_R, 203.578178478, 66.421821522)
            Line((0, 3), (-0.091651514, 2.96))
            ThreePointArc((-0.091651514, 2.96), (-0.1, 1.5), (-0.1, 0))
            Line((-0.1, 0), (0, -0.1))
            Line((0, -0.1), (4.582575695, -0.1))
            Line((4.582575695, -0.1), (4.582575695, 0))
        make_face()
    fillet9_piece_3a = extrude(amount=42.456439237, mode=Mode.PRIVATE)
    fillet9_piece_3a = split(fillet9_piece_3a, bisect_by=Plane(origin=(15.5, 4.025816439, -58.884062279), z_dir=(1, 0, 0)), keep=Keep.TOP, mode=Mode.PRIVATE)
    with BuildSketch(Plane(origin=(15.5, 3.25, -88), x_dir=(1, 0, 0), z_dir=(0, 0, 1))) as fillet9_piece_3b_section:
        with BuildLine():
            CenterArc((4.582575695, 5), FILLET9_R, 203.578178478, 66.421821522)
            Line((0, 3), (-0.091651514, 2.96))
            ThreePointArc((-0.091651514, 2.96), (-0.1, 1.5), (-0.1, 0))
            Line((-0.1, 0), (0, -0.1))
            Line((0, -0.1), (4.582575695, -0.1))
            Line((4.582575695, -0.1), (4.582575695, 0))
        make_face()
    fillet9_piece_3b = extrude(amount=39.456439237, mode=Mode.PRIVATE)
    fillet9_piece_3b = split(fillet9_piece_3b, bisect_by=Plane(origin=(16.615937721, 4.025816439, -60), z_dir=(0, 0, 1)), keep=Keep.TOP, mode=Mode.PRIVATE)
    fillet9_piece_3 = fillet9_piece_3a & fillet9_piece_3b
    add(fillet9_piece_3)
    with BuildSketch(Plane(origin=(-15.5, 3.25, -48.543560763), x_dir=(-1, 0, 0), z_dir=(0, 0, -1))) as fillet9_piece_4a_section:
        with BuildLine():
            CenterArc((4.582575695, 5), FILLET9_R, 203.578178478, 66.421821522)
            Line((0, 3), (-0.091651514, 2.96))
            ThreePointArc((-0.091651514, 2.96), (-0.1, 1.5), (-0.1, 0))
            Line((-0.1, 0), (0, -0.1))
            Line((0, -0.1), (4.582575695, -0.1))
            Line((4.582575695, -0.1), (4.582575695, 0))
        make_face()
    fillet9_piece_4a = extrude(amount=39.456439237, mode=Mode.PRIVATE)
    fillet9_piece_4a = split(fillet9_piece_4a, bisect_by=Plane(origin=(-16.615937721, 4.025816439, -60), z_dir=(0, 0, 1)), keep=Keep.TOP, mode=Mode.PRIVATE)
    with BuildSketch(Plane(origin=(15.5, 3.25, -60), x_dir=(0, 0, 1), z_dir=(-1, 0, 0))) as fillet9_piece_4b_section:
        with BuildLine():
            CenterArc((4.582575695, 5), FILLET9_R, 203.578178478, 66.421821522)
            Line((0, 3), (-0.091651514, 2.96))
            ThreePointArc((-0.091651514, 2.96), (-0.1, 1.5), (-0.1, 0))
            Line((-0.1, 0), (0, -0.1))
            Line((0, -0.1), (4.582575695, -0.1))
            Line((4.582575695, -0.1), (4.582575695, 0))
        make_face()
    fillet9_piece_4b = extrude(amount=42.456439237, mode=Mode.PRIVATE)
    fillet9_piece_4b = split(fillet9_piece_4b, bisect_by=Plane(origin=(-15.5, 4.025816439, -58.884062279), z_dir=(-1, 0, 0)), keep=Keep.TOP, mode=Mode.PRIVATE)
    fillet9_piece_4 = fillet9_piece_4a & fillet9_piece_4b
    add(fillet9_piece_4)


solid = part.part
